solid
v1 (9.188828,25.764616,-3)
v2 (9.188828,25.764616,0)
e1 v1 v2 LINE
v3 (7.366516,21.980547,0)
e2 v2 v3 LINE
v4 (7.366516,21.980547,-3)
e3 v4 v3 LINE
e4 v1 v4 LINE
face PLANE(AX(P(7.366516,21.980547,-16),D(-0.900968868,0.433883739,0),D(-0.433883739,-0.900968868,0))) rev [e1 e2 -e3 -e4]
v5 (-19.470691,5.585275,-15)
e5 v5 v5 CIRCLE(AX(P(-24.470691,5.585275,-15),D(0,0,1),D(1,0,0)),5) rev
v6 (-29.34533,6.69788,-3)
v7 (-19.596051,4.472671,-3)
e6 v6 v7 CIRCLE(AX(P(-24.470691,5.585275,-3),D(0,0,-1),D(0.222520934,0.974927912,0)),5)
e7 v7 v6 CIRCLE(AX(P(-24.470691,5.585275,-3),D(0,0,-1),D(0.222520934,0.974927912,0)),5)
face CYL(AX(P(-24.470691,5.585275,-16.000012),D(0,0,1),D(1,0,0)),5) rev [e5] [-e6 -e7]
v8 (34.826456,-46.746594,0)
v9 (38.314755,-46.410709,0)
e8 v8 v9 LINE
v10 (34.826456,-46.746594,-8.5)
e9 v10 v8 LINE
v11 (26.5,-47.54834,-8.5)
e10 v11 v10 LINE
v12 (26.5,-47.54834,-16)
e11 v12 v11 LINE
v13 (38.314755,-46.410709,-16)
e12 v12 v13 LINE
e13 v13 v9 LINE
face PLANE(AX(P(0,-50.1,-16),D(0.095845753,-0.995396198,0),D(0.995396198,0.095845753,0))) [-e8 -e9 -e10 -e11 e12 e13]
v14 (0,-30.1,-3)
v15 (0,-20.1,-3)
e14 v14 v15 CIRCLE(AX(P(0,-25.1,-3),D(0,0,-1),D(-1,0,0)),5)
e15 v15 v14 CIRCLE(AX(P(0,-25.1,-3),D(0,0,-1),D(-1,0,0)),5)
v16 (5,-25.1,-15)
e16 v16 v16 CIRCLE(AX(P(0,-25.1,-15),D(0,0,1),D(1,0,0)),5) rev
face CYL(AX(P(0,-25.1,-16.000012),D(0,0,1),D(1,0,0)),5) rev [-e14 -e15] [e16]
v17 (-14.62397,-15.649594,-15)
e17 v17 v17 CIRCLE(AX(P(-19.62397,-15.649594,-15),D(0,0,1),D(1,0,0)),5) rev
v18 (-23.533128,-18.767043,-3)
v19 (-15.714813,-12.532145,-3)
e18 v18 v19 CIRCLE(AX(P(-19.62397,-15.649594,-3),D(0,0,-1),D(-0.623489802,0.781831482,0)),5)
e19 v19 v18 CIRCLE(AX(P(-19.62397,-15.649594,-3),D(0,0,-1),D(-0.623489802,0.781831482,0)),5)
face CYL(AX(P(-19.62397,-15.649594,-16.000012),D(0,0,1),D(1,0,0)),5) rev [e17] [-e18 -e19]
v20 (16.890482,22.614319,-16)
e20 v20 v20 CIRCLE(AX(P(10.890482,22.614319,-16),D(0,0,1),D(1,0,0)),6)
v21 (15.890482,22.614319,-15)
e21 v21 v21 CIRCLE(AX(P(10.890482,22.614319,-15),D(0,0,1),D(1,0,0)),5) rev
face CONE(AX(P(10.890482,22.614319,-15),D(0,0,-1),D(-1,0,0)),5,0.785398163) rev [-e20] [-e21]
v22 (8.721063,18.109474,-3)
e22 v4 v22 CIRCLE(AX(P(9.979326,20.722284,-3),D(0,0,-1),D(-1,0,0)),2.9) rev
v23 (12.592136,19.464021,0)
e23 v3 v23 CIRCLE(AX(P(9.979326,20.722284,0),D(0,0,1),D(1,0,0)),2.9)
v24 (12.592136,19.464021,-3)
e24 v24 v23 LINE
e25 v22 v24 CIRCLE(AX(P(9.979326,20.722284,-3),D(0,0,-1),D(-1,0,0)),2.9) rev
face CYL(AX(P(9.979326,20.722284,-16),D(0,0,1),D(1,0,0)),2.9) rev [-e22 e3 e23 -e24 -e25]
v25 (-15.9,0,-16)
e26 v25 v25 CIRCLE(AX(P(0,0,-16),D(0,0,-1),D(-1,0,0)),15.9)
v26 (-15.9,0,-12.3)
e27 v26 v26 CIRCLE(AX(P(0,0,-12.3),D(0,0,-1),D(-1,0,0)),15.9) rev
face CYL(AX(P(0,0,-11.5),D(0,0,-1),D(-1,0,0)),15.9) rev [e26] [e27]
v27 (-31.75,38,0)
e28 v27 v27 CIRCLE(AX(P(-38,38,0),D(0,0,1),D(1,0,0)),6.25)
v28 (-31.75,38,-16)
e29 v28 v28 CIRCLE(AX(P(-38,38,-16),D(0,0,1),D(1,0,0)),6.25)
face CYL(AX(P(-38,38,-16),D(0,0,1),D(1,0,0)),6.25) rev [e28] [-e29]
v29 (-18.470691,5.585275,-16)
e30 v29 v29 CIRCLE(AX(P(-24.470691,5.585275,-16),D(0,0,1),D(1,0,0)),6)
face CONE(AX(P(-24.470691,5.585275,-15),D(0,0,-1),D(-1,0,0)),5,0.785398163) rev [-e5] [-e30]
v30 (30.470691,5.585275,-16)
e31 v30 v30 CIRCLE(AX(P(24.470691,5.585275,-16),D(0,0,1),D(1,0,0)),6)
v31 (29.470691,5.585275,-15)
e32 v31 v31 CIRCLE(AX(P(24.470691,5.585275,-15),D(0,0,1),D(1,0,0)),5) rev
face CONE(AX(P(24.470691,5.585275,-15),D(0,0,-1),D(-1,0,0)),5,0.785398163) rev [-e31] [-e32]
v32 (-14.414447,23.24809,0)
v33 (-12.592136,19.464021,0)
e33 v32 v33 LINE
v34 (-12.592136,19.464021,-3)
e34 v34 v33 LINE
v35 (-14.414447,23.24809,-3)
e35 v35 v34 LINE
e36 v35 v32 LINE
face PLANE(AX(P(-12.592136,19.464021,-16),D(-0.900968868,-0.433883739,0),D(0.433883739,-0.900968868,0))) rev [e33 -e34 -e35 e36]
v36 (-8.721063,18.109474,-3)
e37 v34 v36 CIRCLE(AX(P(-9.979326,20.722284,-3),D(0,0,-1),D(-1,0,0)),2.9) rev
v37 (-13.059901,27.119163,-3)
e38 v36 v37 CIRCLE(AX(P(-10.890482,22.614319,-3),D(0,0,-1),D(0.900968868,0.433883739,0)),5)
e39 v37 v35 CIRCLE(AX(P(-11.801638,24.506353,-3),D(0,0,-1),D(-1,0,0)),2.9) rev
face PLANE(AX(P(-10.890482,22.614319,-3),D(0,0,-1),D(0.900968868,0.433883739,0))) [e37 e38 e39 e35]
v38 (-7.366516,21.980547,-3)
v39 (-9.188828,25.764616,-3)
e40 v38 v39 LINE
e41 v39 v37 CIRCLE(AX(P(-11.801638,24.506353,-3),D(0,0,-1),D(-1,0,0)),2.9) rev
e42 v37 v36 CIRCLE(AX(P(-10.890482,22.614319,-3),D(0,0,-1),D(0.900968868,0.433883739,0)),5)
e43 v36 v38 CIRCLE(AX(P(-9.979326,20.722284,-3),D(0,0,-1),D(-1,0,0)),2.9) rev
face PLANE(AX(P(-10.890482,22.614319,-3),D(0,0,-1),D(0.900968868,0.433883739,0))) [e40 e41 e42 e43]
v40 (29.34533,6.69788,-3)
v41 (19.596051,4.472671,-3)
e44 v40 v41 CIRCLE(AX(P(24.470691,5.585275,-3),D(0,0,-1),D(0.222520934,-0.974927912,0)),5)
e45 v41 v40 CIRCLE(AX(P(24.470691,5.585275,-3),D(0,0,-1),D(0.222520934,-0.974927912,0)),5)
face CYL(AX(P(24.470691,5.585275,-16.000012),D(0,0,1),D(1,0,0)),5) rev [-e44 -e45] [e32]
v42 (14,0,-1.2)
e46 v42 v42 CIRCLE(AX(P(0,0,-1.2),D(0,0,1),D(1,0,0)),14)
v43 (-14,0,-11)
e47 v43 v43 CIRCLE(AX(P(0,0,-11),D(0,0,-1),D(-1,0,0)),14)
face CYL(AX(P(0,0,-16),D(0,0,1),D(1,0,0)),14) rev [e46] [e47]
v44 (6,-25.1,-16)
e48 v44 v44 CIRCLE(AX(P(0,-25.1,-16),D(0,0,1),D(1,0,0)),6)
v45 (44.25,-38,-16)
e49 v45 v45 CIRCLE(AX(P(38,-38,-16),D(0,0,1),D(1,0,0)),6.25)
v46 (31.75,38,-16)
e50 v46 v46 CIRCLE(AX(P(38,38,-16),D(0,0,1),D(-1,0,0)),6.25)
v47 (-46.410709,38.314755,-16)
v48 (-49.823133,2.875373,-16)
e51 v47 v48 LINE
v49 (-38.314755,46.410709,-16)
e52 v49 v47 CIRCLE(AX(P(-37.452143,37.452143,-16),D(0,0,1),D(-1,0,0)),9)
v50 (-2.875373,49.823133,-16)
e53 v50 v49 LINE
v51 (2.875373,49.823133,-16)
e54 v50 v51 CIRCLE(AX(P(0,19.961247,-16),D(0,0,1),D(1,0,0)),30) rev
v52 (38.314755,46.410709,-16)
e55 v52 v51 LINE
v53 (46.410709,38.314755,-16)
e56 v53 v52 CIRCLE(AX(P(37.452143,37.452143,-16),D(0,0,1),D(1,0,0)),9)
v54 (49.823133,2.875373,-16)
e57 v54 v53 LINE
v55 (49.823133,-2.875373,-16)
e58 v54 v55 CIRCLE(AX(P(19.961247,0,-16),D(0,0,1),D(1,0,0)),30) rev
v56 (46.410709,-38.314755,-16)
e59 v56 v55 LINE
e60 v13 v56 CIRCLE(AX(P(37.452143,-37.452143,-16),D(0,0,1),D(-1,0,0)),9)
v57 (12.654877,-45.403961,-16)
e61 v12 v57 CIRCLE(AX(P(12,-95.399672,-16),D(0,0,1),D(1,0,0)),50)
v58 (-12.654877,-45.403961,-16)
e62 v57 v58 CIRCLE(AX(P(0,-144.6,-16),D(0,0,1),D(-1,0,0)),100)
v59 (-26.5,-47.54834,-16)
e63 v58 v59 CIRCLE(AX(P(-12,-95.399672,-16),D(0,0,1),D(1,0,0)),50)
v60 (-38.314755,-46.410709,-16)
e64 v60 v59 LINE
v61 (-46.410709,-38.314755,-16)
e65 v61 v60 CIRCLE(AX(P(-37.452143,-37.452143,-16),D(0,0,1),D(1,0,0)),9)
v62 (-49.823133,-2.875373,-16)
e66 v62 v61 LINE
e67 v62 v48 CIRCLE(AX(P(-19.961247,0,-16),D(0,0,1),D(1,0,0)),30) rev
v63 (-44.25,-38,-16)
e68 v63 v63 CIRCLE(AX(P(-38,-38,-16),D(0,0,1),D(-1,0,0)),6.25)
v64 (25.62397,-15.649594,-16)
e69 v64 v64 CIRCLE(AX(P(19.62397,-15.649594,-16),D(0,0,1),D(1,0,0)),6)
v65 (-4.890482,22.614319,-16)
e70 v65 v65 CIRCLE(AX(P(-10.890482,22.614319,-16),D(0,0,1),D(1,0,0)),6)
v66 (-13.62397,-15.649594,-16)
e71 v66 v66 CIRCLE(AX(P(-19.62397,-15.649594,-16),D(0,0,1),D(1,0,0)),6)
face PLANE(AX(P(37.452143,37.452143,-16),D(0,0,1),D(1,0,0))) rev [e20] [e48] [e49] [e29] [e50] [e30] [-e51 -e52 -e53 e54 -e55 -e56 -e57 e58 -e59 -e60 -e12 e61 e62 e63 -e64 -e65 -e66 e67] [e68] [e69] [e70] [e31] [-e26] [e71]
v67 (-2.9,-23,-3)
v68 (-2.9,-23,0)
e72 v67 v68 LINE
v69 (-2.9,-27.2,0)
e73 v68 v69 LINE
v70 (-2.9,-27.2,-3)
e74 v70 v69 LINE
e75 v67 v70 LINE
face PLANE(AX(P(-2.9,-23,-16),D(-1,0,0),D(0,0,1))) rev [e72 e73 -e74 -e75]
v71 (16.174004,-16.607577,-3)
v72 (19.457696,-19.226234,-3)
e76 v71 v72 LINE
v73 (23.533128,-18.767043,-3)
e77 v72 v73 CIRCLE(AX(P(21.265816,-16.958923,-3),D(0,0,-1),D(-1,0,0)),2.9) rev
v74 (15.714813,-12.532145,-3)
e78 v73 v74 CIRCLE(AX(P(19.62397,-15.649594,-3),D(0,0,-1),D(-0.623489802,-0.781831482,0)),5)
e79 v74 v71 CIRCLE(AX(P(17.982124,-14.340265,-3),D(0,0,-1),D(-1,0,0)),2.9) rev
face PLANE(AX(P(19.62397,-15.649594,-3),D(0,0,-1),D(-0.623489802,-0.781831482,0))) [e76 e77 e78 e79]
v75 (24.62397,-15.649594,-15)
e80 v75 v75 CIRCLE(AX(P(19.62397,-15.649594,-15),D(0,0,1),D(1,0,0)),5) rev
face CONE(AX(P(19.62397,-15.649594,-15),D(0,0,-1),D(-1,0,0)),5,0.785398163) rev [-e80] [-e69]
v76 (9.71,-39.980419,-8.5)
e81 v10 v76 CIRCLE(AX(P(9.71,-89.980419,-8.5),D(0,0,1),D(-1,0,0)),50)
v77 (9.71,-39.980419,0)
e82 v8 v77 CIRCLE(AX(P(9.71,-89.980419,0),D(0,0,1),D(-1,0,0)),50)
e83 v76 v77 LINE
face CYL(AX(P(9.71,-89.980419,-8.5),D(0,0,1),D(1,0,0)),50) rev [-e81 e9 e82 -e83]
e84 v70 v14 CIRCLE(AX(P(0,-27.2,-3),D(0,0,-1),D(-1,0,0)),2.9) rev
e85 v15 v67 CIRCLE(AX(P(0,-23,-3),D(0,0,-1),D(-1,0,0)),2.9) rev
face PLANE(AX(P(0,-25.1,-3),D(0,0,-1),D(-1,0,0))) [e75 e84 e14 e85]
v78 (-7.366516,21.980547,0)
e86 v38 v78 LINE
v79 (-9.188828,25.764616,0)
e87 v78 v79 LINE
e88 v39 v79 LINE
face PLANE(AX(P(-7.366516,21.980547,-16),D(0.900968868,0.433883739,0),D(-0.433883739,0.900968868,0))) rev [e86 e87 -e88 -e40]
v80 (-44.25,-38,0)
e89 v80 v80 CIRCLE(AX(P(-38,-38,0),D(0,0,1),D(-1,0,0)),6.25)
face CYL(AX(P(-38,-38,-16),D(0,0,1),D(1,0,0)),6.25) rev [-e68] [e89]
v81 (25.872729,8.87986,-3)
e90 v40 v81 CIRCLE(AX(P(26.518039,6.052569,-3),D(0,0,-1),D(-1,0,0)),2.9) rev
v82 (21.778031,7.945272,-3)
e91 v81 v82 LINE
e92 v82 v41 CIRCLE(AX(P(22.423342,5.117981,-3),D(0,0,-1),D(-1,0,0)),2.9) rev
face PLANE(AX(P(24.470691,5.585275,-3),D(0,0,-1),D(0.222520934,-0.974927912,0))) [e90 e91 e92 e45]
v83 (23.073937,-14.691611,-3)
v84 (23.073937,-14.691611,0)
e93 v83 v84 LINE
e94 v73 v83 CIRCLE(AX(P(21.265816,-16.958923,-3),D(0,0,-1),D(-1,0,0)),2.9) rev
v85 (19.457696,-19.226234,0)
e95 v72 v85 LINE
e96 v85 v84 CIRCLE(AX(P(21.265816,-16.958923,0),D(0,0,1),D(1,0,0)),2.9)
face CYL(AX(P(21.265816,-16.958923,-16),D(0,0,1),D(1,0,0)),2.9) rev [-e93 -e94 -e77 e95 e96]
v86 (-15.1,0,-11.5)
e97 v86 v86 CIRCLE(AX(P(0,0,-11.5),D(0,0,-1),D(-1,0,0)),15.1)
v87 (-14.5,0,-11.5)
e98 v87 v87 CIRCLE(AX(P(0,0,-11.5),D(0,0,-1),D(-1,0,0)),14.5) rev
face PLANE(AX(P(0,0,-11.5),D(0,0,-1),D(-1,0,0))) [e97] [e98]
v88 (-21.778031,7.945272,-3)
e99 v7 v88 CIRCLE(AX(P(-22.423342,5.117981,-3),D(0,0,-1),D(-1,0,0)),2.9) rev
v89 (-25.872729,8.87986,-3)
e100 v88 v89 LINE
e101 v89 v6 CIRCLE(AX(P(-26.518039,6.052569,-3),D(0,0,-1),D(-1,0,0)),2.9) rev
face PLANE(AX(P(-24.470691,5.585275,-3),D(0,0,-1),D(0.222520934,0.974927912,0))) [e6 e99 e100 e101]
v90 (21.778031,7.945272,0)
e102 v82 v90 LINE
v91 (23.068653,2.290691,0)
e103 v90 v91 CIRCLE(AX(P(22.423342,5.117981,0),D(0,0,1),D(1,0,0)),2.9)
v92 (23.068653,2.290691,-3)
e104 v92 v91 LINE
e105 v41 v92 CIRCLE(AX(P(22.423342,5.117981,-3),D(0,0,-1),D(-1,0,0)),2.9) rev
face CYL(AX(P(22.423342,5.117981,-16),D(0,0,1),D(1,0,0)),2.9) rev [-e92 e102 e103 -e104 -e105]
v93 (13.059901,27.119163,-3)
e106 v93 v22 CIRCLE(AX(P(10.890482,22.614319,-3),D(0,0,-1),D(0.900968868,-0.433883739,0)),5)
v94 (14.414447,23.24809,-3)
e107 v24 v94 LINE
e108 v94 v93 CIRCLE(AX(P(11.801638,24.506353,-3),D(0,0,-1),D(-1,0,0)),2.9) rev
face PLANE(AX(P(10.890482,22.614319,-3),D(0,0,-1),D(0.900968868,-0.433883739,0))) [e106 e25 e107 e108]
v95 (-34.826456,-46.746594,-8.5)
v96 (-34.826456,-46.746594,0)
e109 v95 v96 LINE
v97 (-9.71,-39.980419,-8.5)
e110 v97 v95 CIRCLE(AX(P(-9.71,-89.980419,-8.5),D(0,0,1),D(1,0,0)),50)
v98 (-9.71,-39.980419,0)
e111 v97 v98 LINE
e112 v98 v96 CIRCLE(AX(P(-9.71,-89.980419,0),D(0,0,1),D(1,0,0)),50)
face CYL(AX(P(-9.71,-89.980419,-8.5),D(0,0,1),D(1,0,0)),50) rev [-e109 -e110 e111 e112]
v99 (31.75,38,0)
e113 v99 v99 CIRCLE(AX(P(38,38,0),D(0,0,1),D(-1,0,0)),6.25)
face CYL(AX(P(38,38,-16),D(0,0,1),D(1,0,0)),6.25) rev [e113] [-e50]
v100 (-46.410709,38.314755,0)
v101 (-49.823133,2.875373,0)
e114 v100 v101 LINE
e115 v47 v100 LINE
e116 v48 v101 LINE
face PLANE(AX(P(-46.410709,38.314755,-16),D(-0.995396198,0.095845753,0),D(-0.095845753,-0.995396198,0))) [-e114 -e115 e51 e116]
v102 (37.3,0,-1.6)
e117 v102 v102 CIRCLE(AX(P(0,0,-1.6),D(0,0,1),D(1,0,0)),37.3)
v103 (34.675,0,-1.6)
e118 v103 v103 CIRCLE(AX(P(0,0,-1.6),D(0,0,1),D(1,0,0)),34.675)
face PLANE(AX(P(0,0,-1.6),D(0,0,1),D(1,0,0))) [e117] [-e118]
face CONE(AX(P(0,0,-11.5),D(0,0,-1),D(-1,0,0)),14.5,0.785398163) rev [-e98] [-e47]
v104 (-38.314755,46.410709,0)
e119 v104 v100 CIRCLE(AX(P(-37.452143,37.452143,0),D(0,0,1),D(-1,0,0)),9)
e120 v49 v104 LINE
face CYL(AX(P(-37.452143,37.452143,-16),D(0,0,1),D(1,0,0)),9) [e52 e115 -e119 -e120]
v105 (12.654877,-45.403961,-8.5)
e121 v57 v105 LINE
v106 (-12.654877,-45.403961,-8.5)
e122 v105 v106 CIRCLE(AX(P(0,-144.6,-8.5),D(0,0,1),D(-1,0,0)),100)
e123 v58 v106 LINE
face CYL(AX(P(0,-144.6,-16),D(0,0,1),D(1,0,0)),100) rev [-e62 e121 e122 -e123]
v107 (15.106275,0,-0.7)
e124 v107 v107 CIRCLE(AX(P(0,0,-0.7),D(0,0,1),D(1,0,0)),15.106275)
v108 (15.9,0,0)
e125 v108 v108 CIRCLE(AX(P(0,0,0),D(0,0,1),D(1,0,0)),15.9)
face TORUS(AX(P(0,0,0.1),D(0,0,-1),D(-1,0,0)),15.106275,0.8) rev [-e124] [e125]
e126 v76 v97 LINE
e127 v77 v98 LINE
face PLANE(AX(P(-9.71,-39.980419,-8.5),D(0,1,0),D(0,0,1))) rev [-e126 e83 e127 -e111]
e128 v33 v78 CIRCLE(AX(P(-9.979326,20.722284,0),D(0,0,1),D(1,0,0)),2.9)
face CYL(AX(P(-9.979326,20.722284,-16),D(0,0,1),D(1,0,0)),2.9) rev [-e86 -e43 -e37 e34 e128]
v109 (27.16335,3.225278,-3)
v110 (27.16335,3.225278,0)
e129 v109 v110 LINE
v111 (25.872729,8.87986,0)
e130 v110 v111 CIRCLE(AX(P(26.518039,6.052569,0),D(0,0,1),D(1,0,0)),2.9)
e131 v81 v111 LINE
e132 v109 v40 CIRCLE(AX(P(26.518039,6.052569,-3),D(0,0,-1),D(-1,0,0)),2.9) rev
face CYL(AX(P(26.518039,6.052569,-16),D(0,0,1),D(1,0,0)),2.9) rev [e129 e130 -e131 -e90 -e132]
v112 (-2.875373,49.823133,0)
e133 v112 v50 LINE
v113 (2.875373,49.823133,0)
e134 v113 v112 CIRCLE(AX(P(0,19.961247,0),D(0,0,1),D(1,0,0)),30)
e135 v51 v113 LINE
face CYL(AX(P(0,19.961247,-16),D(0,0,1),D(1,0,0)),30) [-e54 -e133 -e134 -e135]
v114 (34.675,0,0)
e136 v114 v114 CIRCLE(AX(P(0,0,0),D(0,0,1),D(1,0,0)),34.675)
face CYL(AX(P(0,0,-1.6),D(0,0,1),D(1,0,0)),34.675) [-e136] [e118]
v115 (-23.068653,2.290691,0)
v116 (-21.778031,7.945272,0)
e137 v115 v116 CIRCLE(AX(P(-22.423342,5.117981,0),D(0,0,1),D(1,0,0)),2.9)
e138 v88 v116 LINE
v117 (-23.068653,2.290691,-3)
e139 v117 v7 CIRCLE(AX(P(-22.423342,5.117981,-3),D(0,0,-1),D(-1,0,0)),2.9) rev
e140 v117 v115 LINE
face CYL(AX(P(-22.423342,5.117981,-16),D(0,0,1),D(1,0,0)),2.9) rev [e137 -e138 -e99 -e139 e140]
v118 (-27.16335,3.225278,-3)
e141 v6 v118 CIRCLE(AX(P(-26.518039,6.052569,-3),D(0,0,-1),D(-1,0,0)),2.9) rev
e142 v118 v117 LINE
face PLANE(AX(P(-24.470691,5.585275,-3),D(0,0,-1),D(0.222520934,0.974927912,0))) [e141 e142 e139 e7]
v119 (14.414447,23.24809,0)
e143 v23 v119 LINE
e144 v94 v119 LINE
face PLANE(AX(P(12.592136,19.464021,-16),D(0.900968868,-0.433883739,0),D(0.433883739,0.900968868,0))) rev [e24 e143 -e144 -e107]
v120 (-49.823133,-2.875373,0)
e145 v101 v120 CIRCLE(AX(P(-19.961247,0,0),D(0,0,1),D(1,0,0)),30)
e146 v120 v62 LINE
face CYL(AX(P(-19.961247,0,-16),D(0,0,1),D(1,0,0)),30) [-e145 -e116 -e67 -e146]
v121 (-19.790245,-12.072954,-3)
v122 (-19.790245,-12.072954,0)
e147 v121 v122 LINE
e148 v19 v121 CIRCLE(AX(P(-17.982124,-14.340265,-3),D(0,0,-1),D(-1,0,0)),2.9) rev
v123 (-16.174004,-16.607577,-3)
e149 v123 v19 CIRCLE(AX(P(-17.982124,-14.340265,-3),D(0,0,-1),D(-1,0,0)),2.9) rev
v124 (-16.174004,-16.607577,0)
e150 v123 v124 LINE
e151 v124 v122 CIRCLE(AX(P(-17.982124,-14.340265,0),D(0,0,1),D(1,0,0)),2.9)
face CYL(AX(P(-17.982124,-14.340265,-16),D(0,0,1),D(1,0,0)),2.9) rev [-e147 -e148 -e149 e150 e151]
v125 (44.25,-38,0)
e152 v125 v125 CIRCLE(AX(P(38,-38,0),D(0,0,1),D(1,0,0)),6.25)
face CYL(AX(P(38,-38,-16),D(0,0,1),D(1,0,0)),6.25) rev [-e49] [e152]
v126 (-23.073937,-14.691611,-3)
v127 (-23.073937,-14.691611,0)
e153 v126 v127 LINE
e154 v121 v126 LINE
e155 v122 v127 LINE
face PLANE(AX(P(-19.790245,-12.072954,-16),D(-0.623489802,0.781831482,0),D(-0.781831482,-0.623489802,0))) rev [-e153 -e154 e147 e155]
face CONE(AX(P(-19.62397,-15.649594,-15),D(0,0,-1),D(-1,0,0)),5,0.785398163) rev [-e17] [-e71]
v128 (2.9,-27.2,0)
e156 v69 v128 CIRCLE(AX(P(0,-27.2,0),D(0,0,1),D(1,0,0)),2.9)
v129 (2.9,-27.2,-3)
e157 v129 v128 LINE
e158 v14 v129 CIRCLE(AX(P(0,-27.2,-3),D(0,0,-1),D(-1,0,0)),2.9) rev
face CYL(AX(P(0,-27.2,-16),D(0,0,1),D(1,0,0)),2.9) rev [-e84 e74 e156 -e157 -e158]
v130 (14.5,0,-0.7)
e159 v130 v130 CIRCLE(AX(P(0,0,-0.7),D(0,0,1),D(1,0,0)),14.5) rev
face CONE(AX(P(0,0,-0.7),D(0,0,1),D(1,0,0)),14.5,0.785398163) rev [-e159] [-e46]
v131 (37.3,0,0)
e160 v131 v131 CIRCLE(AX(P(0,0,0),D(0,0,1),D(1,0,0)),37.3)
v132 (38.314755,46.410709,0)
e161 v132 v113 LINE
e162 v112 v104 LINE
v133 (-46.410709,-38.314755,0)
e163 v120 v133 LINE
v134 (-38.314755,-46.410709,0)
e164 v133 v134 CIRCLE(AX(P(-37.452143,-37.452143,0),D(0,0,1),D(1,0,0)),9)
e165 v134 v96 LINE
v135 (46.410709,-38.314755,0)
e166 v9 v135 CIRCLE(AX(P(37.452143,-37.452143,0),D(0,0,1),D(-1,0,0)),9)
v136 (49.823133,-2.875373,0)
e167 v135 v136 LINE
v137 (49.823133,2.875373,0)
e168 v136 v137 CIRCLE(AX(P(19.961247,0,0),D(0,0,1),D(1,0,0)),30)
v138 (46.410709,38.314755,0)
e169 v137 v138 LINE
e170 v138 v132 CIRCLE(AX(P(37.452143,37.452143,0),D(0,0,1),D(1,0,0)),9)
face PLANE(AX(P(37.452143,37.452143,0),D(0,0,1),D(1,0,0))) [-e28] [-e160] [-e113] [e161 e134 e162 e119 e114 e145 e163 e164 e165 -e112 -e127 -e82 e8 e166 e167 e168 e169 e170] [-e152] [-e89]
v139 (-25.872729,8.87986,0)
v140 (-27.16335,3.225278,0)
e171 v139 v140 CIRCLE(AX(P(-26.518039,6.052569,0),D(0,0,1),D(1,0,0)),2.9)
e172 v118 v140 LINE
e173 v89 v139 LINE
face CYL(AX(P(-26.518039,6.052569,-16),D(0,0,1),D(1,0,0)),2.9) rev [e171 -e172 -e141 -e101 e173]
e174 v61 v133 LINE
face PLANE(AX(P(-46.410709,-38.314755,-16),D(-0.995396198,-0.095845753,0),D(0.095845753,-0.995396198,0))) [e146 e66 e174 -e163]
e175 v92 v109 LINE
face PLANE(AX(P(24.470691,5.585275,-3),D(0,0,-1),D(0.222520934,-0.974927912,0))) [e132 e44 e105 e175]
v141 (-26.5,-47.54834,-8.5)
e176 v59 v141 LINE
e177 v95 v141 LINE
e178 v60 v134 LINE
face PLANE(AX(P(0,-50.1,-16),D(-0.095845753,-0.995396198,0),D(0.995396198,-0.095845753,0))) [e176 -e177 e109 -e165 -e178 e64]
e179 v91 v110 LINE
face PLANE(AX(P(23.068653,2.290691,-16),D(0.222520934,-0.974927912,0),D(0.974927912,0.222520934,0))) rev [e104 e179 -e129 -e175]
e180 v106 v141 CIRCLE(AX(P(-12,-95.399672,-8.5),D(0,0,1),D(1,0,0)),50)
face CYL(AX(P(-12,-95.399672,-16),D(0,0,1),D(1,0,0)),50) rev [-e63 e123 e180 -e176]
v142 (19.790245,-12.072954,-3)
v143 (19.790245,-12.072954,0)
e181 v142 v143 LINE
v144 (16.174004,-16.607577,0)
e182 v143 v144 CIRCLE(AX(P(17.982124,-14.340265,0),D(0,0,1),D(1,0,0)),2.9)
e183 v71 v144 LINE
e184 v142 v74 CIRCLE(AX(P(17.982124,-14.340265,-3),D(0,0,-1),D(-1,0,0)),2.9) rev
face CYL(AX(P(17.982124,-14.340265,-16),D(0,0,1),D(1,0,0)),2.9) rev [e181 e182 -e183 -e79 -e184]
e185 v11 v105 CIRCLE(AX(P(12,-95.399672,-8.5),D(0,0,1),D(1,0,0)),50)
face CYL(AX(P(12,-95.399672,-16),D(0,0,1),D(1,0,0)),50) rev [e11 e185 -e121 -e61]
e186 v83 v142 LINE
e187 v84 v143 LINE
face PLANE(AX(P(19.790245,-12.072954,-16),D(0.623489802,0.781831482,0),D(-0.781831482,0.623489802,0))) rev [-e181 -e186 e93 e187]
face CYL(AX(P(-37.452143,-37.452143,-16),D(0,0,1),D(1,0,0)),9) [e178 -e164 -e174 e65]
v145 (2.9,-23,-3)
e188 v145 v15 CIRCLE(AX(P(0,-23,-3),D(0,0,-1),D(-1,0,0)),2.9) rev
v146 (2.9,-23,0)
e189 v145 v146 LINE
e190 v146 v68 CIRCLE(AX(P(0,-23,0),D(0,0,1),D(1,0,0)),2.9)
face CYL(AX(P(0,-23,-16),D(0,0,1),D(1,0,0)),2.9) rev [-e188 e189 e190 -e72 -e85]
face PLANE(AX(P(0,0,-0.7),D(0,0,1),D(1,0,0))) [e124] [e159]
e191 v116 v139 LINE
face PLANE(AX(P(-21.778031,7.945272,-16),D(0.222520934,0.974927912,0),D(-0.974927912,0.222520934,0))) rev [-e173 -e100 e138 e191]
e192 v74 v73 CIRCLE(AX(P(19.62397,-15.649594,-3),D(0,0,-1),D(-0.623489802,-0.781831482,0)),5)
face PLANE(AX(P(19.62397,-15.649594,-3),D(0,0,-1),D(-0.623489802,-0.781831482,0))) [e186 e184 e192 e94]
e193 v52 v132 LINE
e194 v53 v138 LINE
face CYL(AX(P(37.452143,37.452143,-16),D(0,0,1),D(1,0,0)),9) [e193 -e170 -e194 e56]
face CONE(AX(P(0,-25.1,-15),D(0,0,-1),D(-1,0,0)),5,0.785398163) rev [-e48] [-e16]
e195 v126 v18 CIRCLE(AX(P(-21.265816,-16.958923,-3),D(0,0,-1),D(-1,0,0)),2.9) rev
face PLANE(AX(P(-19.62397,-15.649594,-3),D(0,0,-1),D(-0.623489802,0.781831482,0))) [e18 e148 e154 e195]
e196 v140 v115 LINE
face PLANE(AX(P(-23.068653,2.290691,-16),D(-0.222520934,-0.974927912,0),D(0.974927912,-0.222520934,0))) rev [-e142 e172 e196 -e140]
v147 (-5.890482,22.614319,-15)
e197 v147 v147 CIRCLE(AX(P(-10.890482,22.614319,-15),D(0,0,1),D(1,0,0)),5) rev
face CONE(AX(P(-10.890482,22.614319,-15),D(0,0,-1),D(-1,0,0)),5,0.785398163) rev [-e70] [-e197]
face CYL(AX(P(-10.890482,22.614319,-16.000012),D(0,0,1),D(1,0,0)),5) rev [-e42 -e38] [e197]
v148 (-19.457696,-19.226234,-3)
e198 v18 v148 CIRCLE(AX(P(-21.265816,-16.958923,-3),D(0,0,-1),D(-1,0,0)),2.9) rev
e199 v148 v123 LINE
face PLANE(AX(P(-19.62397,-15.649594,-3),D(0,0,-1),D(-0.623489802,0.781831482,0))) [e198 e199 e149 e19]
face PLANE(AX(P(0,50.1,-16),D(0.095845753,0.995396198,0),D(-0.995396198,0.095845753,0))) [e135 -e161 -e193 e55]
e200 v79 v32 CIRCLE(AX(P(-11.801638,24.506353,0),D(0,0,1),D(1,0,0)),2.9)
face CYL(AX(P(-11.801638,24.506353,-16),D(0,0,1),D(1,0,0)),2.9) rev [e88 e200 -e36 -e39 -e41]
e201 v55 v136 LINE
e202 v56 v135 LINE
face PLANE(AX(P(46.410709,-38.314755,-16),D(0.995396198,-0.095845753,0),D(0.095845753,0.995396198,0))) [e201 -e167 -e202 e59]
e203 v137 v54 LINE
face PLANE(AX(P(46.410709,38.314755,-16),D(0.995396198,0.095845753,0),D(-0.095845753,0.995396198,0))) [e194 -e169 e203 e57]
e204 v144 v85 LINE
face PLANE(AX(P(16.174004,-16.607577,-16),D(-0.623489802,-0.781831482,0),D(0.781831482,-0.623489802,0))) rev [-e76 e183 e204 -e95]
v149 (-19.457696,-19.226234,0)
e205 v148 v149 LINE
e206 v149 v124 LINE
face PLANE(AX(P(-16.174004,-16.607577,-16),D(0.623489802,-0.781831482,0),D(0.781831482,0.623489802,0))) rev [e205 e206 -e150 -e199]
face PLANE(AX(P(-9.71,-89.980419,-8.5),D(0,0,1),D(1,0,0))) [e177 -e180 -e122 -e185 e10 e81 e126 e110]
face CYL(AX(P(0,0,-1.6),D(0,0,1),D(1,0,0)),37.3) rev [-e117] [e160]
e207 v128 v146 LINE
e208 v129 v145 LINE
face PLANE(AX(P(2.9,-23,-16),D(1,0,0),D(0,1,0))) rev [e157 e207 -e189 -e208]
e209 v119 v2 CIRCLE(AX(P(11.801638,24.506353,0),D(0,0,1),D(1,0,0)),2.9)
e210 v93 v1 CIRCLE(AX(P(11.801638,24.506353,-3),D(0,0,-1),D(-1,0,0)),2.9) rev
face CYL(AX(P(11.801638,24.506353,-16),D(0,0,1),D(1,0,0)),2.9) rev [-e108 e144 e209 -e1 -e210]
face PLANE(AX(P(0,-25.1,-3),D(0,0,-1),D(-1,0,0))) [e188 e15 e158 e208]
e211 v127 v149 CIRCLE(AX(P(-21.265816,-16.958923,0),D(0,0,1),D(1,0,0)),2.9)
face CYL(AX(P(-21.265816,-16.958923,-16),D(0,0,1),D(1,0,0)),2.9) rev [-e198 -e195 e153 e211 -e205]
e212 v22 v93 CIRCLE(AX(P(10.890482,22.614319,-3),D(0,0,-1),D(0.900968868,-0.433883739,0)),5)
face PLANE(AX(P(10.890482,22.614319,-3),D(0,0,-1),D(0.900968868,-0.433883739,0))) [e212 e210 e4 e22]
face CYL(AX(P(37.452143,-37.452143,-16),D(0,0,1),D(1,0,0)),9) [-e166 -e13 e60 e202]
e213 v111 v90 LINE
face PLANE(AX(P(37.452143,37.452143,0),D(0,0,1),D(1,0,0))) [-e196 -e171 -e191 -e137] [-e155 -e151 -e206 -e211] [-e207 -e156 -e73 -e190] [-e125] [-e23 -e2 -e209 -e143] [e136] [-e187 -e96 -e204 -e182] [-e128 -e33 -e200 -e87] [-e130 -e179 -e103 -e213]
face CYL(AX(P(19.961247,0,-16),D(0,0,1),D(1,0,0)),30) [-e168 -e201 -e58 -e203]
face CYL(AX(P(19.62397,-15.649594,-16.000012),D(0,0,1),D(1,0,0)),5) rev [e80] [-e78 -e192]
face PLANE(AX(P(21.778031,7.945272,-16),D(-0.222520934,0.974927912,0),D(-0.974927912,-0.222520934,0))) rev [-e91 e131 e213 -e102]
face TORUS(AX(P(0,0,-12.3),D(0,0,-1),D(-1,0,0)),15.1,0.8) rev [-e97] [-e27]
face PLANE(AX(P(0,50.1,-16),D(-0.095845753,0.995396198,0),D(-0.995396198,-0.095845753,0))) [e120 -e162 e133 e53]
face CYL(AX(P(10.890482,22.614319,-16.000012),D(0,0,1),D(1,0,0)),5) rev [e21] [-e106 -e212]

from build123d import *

# Parameters (mm, degrees)
SKETCH1_R           = 14
SKETCH1_R_2         = 6.25
BOSS_EXTRUDE1_DEPTH = 16
SKETCH2_R           = 15.9
CUT_EXTRUDE1_DEPTH  = 0.7
SKETCH3_R           = 37.3
SKETCH3_R_2         = 34.675
CUT_EXTRUDE2_DEPTH  = 1.6
CUT_EXTRUDE4_START  = -4.5
SKETCH8_R           = 15.9
CUT_EXTRUDE4_DEPTH  = 4.5
CUT_EXTRUDE5_DEPTH  = 8.5
CUT_EXTRUDE6_DEPTH  = 72.360142937
CHAMFER1_SIZE       = 0.5
FILLET1_R           = 0.8
FILLET2_R           = 30
CUT_EXTRUDE7_START  = -13
SKETCH11_R          = 5
CUT_EXTRUDE7_DEPTH  = 86.444823388
CIRPATTERN1_COUNT   = 7
CHAMFER2_SIZE       = 1


with BuildPart() as part:
    # Sketch1 → Boss-Extrude1 (new body)
    with BuildSketch(Plane.XY):
        with BuildLine():
            Line((0, 50.1), (-38.314754723, 46.410708736))
            ThreePointArc((-38.314754723, 46.410708736), (-43.816103981, 43.816103981), (-46.410708736, 38.314754723))
            Line((-46.410708736, 38.314754723), (-50.1, 0))
            Line((-50.1, 0), (-46.410708736, -38.314754723))
            ThreePointArc((-46.410708736, -38.314754723), (-43.816103981, -43.816103981), (-38.314754723, -46.410708736))
            Line((-38.314754723, -46.410708736), (0, -50.1))
            Line((0, -50.1), (38.314754723, -46.410708736))
            ThreePointArc((38.314754723, -46.410708736), (43.816103981, -43.816103981), (46.410708736, -38.314754723))
            Line((46.410708736, -38.314754723), (50.1, 0))
            Line((50.1, 0), (46.410708736, 38.314754723))
            ThreePointArc((46.410708736, 38.314754723), (43.816103981, 43.816103981), (38.314754723, 46.410708736))
            Line((38.314754723, 46.410708736), (0, 50.1))
        make_face()
        Circle(SKETCH1_R, mode=Mode.SUBTRACT)
        with Locations((-38, 38)):
            Circle(SKETCH1_R_2, mode=Mode.SUBTRACT)
        with Locations(Location((38, 38, 0), (0, 0, 180))):
            Circle(SKETCH1_R_2, mode=Mode.SUBTRACT)
        with Locations((38, -38)):
            Circle(SKETCH1_R_2, mode=Mode.SUBTRACT)
        with Locations(Location((-38, -38, 0), (0, 0, 180))):
            Circle(SKETCH1_R_2, mode=Mode.SUBTRACT)
        with BuildLine():
            Line((2.9, -23), (2.9, -27.2))
            ThreePointArc((2.9, -27.2), (0, -30.1), (-2.9, -27.2))
            Line((-2.9, -27.2), (-2.9, -23))
            ThreePointArc((-2.9, -23), (0, -20.1), (2.9, -23))
        make_face(mode=Mode.SUBTRACT)
        with BuildLine():
            Line((-16.174003671, -16.607576742), (-19.457695898, -19.22623391))
            ThreePointArc((-19.457695898, -19.22623391), (-23.533127622, -18.767043036), (-23.073936749, -14.691611311))
            Line((-23.073936749, -14.691611311), (-19.790244522, -12.072954144))
            ThreePointArc((-19.790244522, -12.072954144), (-15.714812798, -12.532145017), (-16.174003671, -16.607576742))
        make_face(mode=Mode.SUBTRACT)
        with BuildLine():
            Line((-23.068652689, 2.290690536), (-27.16334992, 3.225278458))
            ThreePointArc((-27.16334992, 3.225278458), (-29.345330157, 6.697880112), (-25.872728503, 8.879860349))
            Line((-25.872728503, 8.879860349), (-21.778031272, 7.945272426))
            ThreePointArc((-21.778031272, 7.945272426), (-19.596051035, 4.472670773), (-23.068652689, 2.290690536))
        make_face(mode=Mode.SUBTRACT)
        with BuildLine():
            Line((-12.592135717, 19.464021118), (-14.414447421, 23.248090364))
            ThreePointArc((-14.414447421, 23.248090364), (-13.059900547, 27.119162924), (-9.188827987, 25.76461605))
            Line((-9.188827987, 25.76461605), (-7.366516283, 21.980546805))
            ThreePointArc((-7.366516283, 21.980546805), (-8.721063156, 18.109474245), (-12.592135717, 19.464021118))
        make_face(mode=Mode.SUBTRACT)
        with BuildLine():
            Line((7.366516283, 21.980546805), (9.188827987, 25.76461605))
            ThreePointArc((9.188827987, 25.76461605), (13.059900547, 27.119162924), (14.414447421, 23.248090364))
            Line((14.414447421, 23.248090364), (12.592135717, 19.464021118))
            ThreePointArc((12.592135717, 19.464021118), (8.721063156, 18.109474245), (7.366516283, 21.980546805))
        make_face(mode=Mode.SUBTRACT)
        with BuildLine():
            Line((21.778031272, 7.945272426), (25.872728503, 8.879860349))
            ThreePointArc((25.872728503, 8.879860349), (29.345330157, 6.697880112), (27.16334992, 3.225278458))
            Line((27.16334992, 3.225278458), (23.068652689, 2.290690536))
            ThreePointArc((23.068652689, 2.290690536), (19.596051035, 4.472670773), (21.778031272, 7.945272426))
        make_face(mode=Mode.SUBTRACT)
        with BuildLine():
            Line((19.790244522, -12.072954144), (23.073936749, -14.691611311))
            ThreePointArc((23.073936749, -14.691611311), (23.533127622, -18.767043036), (19.457695898, -19.22623391))
            Line((19.457695898, -19.22623391), (16.174003671, -16.607576742))
            ThreePointArc((16.174003671, -16.607576742), (15.714812798, -12.532145017), (19.790244522, -12.072954144))
        make_face(mode=Mode.SUBTRACT)
    extrude(amount=-BOSS_EXTRUDE1_DEPTH)

    # Sketch2 → Cut-Extrude1 (cut)
    with BuildSketch(Plane.XY):
        Circle(SKETCH2_R)
    extrude(amount=-CUT_EXTRUDE1_DEPTH, mode=Mode.SUBTRACT)

    # Sketch3 → Cut-Extrude2 (cut)
    with BuildSketch(Plane.XY):
        Circle(SKETCH3_R)
        Circle(SKETCH3_R_2, mode=Mode.SUBTRACT)
    extrude(amount=-CUT_EXTRUDE2_DEPTH, mode=Mode.SUBTRACT)

    # Sketch8 → Cut-Extrude4 (cut)
    with BuildSketch(Plane(origin=(0, 0, -16), x_dir=(-1, 0, 0), z_dir=(0, 0, -1)).offset(CUT_EXTRUDE4_START)):
        with Locations(Location((0, 0, 0), (0, 0, 180))):
            Circle(SKETCH8_R)
    extrude(amount=CUT_EXTRUDE4_DEPTH, mode=Mode.SUBTRACT)

    # Sketch9 → Cut-Extrude5 (cut)
    with BuildSketch(Plane.XY):
        with BuildLine():
            Line((-9.71, -39.980418901), (9.71, -39.980418901))
            ThreePointArc((9.71, -39.980418901), (22.715935957, -41.701586791), (34.82645594, -46.746593705))
            Line((34.82645594, -46.746593705), (0, -50.1))
            Line((0, -50.1), (-34.82645594, -46.746593705))
            ThreePointArc((-34.82645594, -46.746593705), (-22.715935957, -41.701586791), (-9.71, -39.980418901))
        make_face()
    extrude(amount=-CUT_EXTRUDE5_DEPTH, mode=Mode.SUBTRACT)

    # Sketch10 → Cut-Extrude6 (cut, through all)
    with BuildSketch(Plane.XY.offset(-8.5)):
        with BuildLine():
            Line((-26.5, -47.548340223), (0, -50.1))
            Line((0, -50.1), (26.5, -47.548340223))
            ThreePointArc((26.5, -47.548340223), (19.652918631, -45.988815018), (12.654876886, -45.403961314))
            ThreePointArc((12.654876886, -45.403961314), (0, -44.6), (-12.654876886, -45.403961314))
            ThreePointArc((-12.654876886, -45.403961314), (-19.652918631, -45.988815018), (-26.5, -47.548340223))
        make_face()
    extrude(amount=-CUT_EXTRUDE6_DEPTH, mode=Mode.SUBTRACT)

    # Chamfer1
    chamfer1_edges = [part.edges().sort_by_distance(p)[0] for p in [
        (-14, 0, -0.7),
        (-14, 0, -11.5),
    ]]
    chamfer(chamfer1_edges, length=CHAMFER1_SIZE)

    # Fillet1
    # the kernel refuses this fillet: 0.8 mm, written as the material it adds along each edge
    with BuildSketch(Plane(origin=(0, 0, -0.7), x_dir=(1, 0, 0), z_dir=(0, -1, 0))) as fillet1_piece_1:
        with BuildLine():
            CenterArc((15.106274607, 0.8), FILLET1_R, 270, 82.819244219)
            Line((15.9, 0.7), (15.915874508, 0.698))
            ThreePointArc((15.915874508, 0.698), (15.916, 0.35), (15.916, 0))
            Line((15.916, 0), (15.9, -0.016))
            Line((15.9, -0.016), (15.106274607, -0.016))
            Line((15.106274607, -0.016), (15.106274607, 0))
        make_face()
    revolve(axis=Axis((0, 0, -0.7), (0, 0, 1)))
    with BuildSketch(Plane(origin=(0, 0, -11.5), x_dir=(1, 0, 0), z_dir=(0, 1, 0))) as fillet1_piece_2:
        with BuildLine():
            CenterArc((15.9 - FILLET1_R, FILLET1_R), FILLET1_R, 270, 90)
            Line((15.9, FILLET1_R), (15.9 + FILLET1_R * 0.02, FILLET1_R))
            Line((15.9 + FILLET1_R * 0.02, FILLET1_R), (15.9 + FILLET1_R * 0.02, -FILLET1_R * 0.02))
            Line((15.9 + FILLET1_R * 0.02, -FILLET1_R * 0.02), (15.9 - FILLET1_R, -FILLET1_R * 0.02))
            Line((15.9 - FILLET1_R, -FILLET1_R * 0.02), (15.9 - FILLET1_R, 0))
        make_face()
    revolve(axis=Axis((0, 0, -11.5), (0, 0, -1)))

    # Fillet2
    fillet2_edges = [part.edges().sort_by_distance(p)[0] for p in [
        (50.1, 0, -8),
        (-50.1, 0, -8),
        (0, 50.1, -8),
    ]]
    fillet(fillet2_edges, radius=FILLET2_R)

    # Sketch11 → Cut-Extrude7 (cut)
    with BuildSketch(Plane(origin=(0, 0, -16), x_dir=(-1, 0, 0), z_dir=(0, 0, -1)).offset(CUT_EXTRUDE7_START)):
        with Locations(Location((0, -25.1, 0), (0, 0, 180))):
            Circle(SKETCH11_R)
    cut_extrude7 = extrude(amount=CUT_EXTRUDE7_DEPTH, mode=Mode.SUBTRACT)

    # CirPattern1: Cut-Extrude7 ×7 about axis
    cirpattern1_axis = Axis((0, 0, 0), (0, 0, 1))
    for i in range(1, CIRPATTERN1_COUNT):
        add(cut_extrude7.rotate(cirpattern1_axis, i * 360 / CIRPATTERN1_COUNT), mode=Mode.SUBTRACT)

    # Chamfer2
    chamfer2_edges = [part.edges().sort_by_distance(p)[0] for p in [
        (-5, -25.1, -16),
        (16.506521201, -19.558751439, -16),
        (25.583295266, 0.710635881, -16),
        (15.395326191, 20.444899889, -16),
        (-6.385637512, 24.78373728, -16),
        (-23.358085926, 10.459915003, -16),
        (-22.741419219, -11.740436614, -16),
    ]]
    chamfer(chamfer2_edges, length=CHAMFER2_SIZE)


solid = part.part
